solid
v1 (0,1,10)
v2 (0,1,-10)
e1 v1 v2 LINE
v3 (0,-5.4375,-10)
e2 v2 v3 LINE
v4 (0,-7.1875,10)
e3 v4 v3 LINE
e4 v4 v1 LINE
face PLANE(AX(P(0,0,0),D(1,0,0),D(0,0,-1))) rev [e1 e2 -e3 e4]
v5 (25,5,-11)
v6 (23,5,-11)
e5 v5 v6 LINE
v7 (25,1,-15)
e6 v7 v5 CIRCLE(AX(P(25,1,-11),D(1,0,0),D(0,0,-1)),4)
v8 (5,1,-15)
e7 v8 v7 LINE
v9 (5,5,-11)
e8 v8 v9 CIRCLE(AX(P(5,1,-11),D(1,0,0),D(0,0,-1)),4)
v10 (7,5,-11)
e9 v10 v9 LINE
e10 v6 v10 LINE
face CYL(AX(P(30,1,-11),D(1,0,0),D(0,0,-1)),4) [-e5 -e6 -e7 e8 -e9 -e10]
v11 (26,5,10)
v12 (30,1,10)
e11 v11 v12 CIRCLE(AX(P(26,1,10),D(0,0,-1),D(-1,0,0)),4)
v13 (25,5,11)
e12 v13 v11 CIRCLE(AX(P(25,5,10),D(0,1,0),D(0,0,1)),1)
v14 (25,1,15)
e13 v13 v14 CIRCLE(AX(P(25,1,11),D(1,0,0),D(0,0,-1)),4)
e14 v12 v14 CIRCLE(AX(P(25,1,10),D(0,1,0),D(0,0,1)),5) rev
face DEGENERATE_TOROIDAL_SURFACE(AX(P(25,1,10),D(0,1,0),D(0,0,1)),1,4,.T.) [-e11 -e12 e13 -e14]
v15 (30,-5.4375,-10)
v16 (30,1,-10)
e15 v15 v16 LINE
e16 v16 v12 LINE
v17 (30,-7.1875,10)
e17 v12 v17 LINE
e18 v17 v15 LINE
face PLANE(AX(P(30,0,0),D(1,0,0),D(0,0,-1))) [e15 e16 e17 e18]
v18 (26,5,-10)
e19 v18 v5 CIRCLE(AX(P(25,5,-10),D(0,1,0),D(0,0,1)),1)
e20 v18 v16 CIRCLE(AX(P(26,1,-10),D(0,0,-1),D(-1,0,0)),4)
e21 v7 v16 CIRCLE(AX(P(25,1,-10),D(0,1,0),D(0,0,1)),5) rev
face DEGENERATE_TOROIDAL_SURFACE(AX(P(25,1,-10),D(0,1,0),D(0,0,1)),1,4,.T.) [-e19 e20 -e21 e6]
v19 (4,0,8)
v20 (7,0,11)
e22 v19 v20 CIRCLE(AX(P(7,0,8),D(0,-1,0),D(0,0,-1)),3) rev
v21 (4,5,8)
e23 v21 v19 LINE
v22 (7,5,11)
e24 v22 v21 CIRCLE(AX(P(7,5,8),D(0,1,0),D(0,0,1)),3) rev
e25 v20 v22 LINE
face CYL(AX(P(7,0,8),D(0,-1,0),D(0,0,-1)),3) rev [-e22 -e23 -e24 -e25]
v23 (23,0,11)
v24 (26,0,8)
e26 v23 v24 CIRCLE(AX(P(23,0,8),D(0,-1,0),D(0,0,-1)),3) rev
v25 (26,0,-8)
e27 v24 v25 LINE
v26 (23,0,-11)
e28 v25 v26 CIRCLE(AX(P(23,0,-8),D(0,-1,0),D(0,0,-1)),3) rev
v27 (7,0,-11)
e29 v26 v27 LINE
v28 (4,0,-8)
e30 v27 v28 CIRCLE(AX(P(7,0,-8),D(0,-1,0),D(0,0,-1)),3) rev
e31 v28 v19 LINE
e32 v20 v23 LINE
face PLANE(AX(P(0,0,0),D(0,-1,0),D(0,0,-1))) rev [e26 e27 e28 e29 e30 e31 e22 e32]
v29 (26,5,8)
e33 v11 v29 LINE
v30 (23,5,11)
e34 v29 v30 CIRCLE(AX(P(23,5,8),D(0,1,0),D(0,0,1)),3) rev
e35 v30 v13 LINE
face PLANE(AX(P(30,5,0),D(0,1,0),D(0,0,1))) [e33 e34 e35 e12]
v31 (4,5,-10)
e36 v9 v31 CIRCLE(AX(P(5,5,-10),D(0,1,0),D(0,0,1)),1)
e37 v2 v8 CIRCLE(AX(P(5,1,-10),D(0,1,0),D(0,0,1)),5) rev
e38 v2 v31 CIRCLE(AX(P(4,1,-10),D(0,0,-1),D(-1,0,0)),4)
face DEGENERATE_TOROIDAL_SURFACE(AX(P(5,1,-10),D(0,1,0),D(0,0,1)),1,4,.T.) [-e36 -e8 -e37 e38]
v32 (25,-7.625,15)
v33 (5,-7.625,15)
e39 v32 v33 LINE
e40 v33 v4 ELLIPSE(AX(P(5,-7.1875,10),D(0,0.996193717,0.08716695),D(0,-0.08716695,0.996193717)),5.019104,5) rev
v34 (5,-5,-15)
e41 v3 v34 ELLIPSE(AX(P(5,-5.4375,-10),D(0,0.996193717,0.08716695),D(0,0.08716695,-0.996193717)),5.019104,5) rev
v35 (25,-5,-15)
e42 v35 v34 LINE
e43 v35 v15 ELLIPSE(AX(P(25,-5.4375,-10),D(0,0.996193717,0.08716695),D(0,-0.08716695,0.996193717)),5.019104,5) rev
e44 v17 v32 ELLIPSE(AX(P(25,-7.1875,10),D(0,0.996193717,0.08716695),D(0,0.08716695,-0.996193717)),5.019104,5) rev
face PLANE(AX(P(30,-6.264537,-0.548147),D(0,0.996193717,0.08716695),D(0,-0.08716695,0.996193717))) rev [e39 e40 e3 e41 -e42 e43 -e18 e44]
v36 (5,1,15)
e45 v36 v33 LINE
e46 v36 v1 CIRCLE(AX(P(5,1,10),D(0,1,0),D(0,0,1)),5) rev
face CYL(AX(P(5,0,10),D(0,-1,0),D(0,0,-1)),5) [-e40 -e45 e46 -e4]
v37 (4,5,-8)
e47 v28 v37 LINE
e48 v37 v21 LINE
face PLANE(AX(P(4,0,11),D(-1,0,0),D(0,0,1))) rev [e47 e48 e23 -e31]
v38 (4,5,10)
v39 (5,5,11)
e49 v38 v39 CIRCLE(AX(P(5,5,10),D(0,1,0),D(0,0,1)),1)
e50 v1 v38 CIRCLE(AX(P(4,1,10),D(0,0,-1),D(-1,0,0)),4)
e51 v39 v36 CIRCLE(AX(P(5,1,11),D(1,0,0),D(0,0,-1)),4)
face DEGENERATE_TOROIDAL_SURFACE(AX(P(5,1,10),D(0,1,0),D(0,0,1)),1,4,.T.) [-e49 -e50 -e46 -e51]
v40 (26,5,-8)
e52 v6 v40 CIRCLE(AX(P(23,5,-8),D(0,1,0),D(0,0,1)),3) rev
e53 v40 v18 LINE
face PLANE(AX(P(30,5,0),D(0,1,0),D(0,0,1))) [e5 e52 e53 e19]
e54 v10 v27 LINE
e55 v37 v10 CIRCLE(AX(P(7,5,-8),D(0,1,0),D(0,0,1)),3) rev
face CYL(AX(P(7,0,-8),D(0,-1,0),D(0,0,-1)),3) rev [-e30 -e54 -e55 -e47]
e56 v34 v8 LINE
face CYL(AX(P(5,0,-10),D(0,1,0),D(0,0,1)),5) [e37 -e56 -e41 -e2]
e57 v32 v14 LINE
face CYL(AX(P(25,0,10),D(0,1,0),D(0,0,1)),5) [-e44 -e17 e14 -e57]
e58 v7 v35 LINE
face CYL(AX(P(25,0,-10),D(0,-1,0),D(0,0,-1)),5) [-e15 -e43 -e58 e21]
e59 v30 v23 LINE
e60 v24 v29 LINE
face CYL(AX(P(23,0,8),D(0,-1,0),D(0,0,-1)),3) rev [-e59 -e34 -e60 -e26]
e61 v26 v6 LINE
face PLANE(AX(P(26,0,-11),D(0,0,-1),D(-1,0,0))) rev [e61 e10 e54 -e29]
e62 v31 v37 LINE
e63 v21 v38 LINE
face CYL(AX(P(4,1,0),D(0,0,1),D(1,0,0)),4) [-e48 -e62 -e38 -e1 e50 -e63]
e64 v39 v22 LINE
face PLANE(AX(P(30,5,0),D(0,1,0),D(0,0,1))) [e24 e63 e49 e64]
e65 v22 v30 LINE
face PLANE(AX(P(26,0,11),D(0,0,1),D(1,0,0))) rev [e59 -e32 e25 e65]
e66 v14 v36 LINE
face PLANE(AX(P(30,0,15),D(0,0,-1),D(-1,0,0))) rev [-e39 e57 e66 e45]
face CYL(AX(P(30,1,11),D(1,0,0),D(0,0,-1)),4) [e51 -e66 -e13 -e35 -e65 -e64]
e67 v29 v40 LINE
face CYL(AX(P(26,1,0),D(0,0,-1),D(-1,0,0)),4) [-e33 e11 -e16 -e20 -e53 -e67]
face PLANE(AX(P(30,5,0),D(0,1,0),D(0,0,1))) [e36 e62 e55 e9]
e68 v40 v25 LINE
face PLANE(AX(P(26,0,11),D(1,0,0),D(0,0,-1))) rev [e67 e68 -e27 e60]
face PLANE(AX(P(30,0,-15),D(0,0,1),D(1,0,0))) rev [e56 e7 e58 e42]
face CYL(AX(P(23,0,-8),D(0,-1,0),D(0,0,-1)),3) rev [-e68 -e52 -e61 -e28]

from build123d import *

# Parameters (mm, degrees)
SKETCH1_W           = 30
SKETCH1_H           = 10
BOSS_EXTRUDE1_DEPTH = 30
SKETCH2_W           = 22
SKETCH2_H           = 22
CUT_EXTRUDE1_DEPTH  = 5
FILLET1_R           = 5
FILLET2_R           = 3
FILLET3_R           = 4


with BuildPart() as part:
    # Sketch1 → Boss-Extrude1 (new body)
    with BuildSketch(Plane(origin=(0, 0, 0), x_dir=(0, 0, -1), z_dir=(1, 0, 0))):
        Polygon((-15, -5), (-15, -7.625), (15, -5), align=None)
        Rectangle(SKETCH1_W, SKETCH1_H)
    extrude(amount=BOSS_EXTRUDE1_DEPTH)

    # Sketch2 → Cut-Extrude1 (cut)
    with BuildSketch(Plane(origin=(0, 5, 0), x_dir=(1, 0, 0), z_dir=(0, 1, 0))):
        with Locations((15, 0)):
            Rectangle(SKETCH2_W, SKETCH2_H)
    extrude(amount=-CUT_EXTRUDE1_DEPTH, mode=Mode.SUBTRACT)

    # Fillet1
    fillet1_edges = [part.edges().sort_by_distance(p)[0] for p in [
        (30, 0, -15),
        (30, -1.3125, 15),
        (0, 0, -15),
        (0, -1.3125, 15),
    ]]
    fillet(fillet1_edges, radius=FILLET1_R)

    # Fillet2
    fillet2_edges = [part.edges().sort_by_distance(p)[0] for p in [
        (26, 2.5, 11),
        (4, 2.5, 11),
        (4, 2.5, -11),
        (26, 2.5, -11),
    ]]
    fillet(fillet2_edges, radius=FILLET2_R)

    # Fillet3
    fillet3_edges = [part.edges().sort_by_distance(p)[0] for p in [
        (15, 5, 15),
        (0, 5, 0),
        (30, 5, 0),
        (15, 5, -15),
        (28.535533906, 5, 13.535533906),
        (28.535533906, 5, -13.535533906),
        (1.464466094, 5, -13.535533906),
        (1.464466094, 5, 13.535533906),
    ]]
    fillet(fillet3_edges, radius=FILLET3_R - 0.0001)  # a hair under: the kernel refuses the full size


solid = part.part
